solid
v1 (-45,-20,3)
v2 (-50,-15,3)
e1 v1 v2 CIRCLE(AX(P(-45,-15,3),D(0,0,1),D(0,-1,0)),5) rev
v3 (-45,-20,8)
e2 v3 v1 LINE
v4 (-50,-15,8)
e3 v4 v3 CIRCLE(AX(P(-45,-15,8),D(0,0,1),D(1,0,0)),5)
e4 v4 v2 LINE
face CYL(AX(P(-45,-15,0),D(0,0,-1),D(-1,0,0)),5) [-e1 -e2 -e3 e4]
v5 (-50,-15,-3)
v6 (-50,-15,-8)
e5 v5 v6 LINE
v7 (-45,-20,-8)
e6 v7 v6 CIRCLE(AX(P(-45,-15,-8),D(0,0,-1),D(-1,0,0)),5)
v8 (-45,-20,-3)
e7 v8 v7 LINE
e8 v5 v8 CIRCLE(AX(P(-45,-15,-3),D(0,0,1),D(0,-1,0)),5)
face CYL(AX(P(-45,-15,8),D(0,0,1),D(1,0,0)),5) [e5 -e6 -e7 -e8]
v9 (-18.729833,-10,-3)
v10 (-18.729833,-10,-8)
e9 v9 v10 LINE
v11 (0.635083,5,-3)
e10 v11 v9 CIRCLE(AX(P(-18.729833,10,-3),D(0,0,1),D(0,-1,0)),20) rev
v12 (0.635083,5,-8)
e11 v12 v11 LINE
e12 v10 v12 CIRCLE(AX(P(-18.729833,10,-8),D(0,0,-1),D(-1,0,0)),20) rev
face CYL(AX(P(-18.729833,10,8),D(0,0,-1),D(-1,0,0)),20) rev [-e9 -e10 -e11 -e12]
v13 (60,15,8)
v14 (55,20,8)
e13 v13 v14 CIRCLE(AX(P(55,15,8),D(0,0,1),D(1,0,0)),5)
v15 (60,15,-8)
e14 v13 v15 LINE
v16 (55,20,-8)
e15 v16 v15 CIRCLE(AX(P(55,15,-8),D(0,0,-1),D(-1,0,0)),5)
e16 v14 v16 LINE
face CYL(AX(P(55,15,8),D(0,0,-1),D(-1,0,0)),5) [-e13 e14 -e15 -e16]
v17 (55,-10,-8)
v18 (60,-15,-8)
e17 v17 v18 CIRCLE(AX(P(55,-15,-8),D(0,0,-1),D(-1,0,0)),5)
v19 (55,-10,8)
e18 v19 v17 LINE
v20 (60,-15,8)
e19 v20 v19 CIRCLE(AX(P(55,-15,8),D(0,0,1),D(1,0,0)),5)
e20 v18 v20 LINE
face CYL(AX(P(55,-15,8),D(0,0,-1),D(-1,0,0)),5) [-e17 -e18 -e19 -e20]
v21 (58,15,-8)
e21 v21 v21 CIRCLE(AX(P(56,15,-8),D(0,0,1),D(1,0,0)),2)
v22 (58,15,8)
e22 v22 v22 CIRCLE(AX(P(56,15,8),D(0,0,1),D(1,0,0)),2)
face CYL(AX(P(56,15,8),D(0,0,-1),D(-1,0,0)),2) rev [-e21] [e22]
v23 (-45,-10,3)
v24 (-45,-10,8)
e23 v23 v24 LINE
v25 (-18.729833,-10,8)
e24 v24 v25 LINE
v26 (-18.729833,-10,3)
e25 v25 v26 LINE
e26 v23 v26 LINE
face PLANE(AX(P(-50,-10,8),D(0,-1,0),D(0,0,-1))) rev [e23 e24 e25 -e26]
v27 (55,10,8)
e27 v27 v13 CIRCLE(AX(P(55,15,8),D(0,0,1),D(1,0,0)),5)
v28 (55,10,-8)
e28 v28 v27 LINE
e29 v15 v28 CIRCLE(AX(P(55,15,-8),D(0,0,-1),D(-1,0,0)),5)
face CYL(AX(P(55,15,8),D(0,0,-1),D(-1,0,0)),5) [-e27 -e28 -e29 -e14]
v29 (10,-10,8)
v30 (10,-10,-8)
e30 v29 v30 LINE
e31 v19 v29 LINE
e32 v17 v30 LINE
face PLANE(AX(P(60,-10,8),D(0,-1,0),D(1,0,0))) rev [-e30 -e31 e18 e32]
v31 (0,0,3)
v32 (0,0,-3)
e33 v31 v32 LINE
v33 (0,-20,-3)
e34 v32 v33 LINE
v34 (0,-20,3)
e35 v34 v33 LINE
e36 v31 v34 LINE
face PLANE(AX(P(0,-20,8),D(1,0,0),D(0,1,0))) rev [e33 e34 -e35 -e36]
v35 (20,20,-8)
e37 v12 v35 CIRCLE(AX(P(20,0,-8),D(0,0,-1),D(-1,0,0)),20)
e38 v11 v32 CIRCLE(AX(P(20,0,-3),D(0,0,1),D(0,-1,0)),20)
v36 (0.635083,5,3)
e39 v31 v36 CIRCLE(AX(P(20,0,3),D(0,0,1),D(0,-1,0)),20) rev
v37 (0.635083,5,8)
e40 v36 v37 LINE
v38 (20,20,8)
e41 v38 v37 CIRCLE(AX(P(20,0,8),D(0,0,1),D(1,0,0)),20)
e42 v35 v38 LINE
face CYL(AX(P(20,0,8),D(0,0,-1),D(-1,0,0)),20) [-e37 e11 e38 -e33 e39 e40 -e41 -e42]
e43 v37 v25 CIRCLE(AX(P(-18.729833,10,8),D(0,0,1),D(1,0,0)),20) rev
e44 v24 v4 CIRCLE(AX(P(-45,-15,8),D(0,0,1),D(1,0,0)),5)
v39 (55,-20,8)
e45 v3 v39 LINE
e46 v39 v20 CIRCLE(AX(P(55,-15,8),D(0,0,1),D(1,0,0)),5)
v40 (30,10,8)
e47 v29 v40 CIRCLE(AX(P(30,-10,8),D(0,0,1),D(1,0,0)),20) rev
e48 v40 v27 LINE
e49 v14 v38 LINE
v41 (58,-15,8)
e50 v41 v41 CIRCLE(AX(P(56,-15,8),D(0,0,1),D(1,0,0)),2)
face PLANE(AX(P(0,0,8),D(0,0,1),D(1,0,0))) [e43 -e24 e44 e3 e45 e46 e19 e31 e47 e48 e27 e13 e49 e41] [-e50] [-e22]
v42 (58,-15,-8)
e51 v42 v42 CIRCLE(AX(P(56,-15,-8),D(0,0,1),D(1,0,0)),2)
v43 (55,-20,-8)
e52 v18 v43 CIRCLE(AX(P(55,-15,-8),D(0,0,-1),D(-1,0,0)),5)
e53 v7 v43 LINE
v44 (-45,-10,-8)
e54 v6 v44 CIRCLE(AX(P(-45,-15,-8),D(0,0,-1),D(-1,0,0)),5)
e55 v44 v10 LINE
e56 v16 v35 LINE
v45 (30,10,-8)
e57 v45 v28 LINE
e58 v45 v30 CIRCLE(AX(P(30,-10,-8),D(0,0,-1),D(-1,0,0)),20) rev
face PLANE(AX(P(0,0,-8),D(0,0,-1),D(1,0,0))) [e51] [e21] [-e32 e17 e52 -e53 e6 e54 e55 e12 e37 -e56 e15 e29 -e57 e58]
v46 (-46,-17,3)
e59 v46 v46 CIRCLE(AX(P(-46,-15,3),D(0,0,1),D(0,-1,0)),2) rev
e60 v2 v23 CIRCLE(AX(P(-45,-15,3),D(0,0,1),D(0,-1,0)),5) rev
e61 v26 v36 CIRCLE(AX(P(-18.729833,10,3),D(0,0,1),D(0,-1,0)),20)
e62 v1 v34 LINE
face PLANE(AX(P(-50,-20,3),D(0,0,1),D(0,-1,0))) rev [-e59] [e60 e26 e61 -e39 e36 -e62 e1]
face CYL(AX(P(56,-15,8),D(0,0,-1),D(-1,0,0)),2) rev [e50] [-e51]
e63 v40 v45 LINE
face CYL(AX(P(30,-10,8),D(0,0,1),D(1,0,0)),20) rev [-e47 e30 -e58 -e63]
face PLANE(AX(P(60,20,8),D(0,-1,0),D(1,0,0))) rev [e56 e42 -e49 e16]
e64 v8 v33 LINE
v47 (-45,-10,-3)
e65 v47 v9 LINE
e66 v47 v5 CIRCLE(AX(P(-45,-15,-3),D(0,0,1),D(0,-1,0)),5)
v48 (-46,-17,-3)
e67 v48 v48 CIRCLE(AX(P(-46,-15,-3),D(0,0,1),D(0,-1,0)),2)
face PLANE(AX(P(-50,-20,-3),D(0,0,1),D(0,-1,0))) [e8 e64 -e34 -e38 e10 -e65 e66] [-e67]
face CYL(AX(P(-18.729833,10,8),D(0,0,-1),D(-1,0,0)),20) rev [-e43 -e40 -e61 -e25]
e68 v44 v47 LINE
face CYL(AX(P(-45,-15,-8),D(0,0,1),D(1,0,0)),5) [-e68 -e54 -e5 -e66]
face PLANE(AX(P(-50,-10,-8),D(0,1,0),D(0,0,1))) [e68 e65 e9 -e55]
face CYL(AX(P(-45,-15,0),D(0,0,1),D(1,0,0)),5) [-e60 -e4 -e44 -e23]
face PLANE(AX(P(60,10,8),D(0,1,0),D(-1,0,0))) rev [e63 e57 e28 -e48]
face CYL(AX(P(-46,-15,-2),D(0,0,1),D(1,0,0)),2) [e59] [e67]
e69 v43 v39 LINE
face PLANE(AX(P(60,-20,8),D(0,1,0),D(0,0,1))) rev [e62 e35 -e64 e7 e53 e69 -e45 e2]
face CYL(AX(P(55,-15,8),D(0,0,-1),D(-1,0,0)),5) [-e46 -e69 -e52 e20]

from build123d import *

# Parameters (mm, degrees)
SKETCH1_R           = 2
BOSS_EXTRUDE1_DEPTH = 8
SKETCH2_W           = 5
SKETCH2_H           = 10
BOSS_EXTRUDE2_DEPTH = 50
SKETCH3_R           = 2
BOSS_EXTRUDE3_DEPTH = 5
FILLET1_R           = 20
FILLET2_R           = 20
FILLET3_R           = 20
FILLET4_R           = 5


# Some blends are built 0.0001 mm under size
with BuildPart() as part:
    # Sketch1 → Boss-Extrude1 (new body)
    with BuildSketch(Plane.XY):
        Polygon((60, 20), (0, 20), (0, 0), (0, -20), (60, -20), (60, -10), (10, -10), (10, 0), (10, 10), (60, 10), align=None)
        with Locations((56, 15)):
            Circle(SKETCH1_R, mode=Mode.SUBTRACT)
        with Locations((56, -15)):
            Circle(SKETCH1_R, mode=Mode.SUBTRACT)
    boss_extrude1 = extrude(amount=BOSS_EXTRUDE1_DEPTH)

    # Sketch2 → Boss-Extrude2 (add)
    with BuildSketch(Plane.ZY):
        with Locations((5.5, -15)):
            Rectangle(SKETCH2_W, SKETCH2_H)
    boss_extrude2 = extrude(amount=BOSS_EXTRUDE2_DEPTH)

    # Sketch3 → Boss-Extrude3 (add)
    with BuildSketch(Plane(origin=(0, 0, 3), x_dir=(-1, 0, 0), z_dir=(0, 0, -1))):
        with Locations(Location((46, -15, 0), (0, 0, 270))):
            Circle(SKETCH3_R)
    boss_extrude3 = extrude(amount=BOSS_EXTRUDE3_DEPTH)

    # Mirror1: Boss-Extrude1, Boss-Extrude2, Boss-Extrude3 across plane
    add(boss_extrude1.mirror(Plane.XY))
    add(boss_extrude2.mirror(Plane.XY))
    add(boss_extrude3.mirror(Plane.XY))

    # Fillet1
    fillet1_edges = [part.edges().sort_by_distance(p)[0] for p in [
        (10, 10, 0),
    ]]
    fillet(fillet1_edges, radius=FILLET1_R - 0.0001)  # a hair under: the kernel refuses the full size

    # Fillet2
    fillet2_edges = [part.edges().sort_by_distance(p)[0] for p in [
        (0, 20, 0),
    ]]
    fillet(fillet2_edges, radius=FILLET2_R)

    # Fillet3
    # the kernel refuses this fillet: 20 mm, written as the material it adds along each edge
    with BuildSketch(Plane(origin=(0, -10, -43.824583655), x_dir=(0.042300987596812424, 0.9991049126334702, 0), z_dir=(0, 0, 1))) as fillet3_piece_1_section:
        with BuildLine():
            CenterArc((19.1898078, 19.559088377), FILLET3_R, 182.424391449, 75.522487814)
            Line((-0.792290453, 18.713068625), (-2.790500278, 18.62846665))
            Line((-2.790500278, 18.62846665), (-1.998209825, -0.084601975))
            Line((-1.998209825, -0.084601975), (0.084601975, -1.998209825))
            ThreePointArc((0.084601975, -1.998209825), (10.075651102, -1.575199949), (14.595801393, -1.955908838))
            Line((14.595801393, -1.955908838), (15.013438339, 0))
        make_face()
    fillet3_piece_1 = extrude(amount=98.64916731, mode=Mode.PRIVATE)
    fillet3_piece_1 = split(fillet3_piece_1, bisect_by=Plane(origin=(-6.457889851, -5.843011077, -8), z_dir=(0, 0, 1)), keep=Keep.TOP, mode=Mode.PRIVATE)
    fillet3_piece_1 = split(fillet3_piece_1, bisect_by=Plane(origin=(-6.457889851, -5.843011077, -3), z_dir=(0, 0, -1)), keep=Keep.TOP, mode=Mode.PRIVATE)
    add(fillet3_piece_1)
    with BuildSketch(Plane(origin=(0, -10, 3), x_dir=(0.042300987596807504, 0.9991049126334706, 0), z_dir=(0, 0, 1))) as fillet3_piece_2:
        with BuildLine():
            CenterArc((19.1898078, 19.559088377), FILLET3_R, 182.424391449, 75.522487814)
            Line((-0.792290453, 18.713068625), (-2.790500278, 18.62846665))
            Line((-2.790500278, 18.62846665), (-1.998209825, -0.084601975))
            Line((-1.998209825, -0.084601975), (0.084601975, -1.998209825))
            ThreePointArc((0.084601975, -1.998209825), (10.075651102, -1.575199949), (14.595801393, -1.955908838))
            Line((14.595801393, -1.955908838), (15.013438339, 0))
        make_face()
    extrude(amount=5)
    with BuildSketch(Plane(origin=(0, -10, 43.824583655), x_dir=(0.042300987596812424, 0.9991049126334702, 0), z_dir=(0, 0, -1))) as fillet3_piece_3_section:
        with BuildLine():
            CenterArc((19.1898078, -19.559088377), FILLET3_R, 102.053120737, 75.522487814)
            Line((-0.792290453, -18.713068625), (-2.790500278, -18.62846665))
            Line((-2.790500278, -18.62846665), (-1.998209825, 0.084601975))
            Line((-1.998209825, 0.084601975), (0.084601975, 1.998209825))
            ThreePointArc((0.084601975, 1.998209825), (10.075651102, 1.575199949), (14.595801393, 1.955908838))
            Line((14.595801393, 1.955908838), (15.013438339, 0))
        make_face()
    fillet3_piece_3 = extrude(amount=98.64916731, mode=Mode.PRIVATE)
    fillet3_piece_3 = split(fillet3_piece_3, bisect_by=Plane(origin=(-6.457889851, -5.843011077, 8), z_dir=(0, 0, -1)), keep=Keep.TOP, mode=Mode.PRIVATE)
    fillet3_piece_3 = split(fillet3_piece_3, bisect_by=Plane(origin=(-6.457889851, -5.843011077, 3), z_dir=(0, 0, 1)), keep=Keep.TOP, mode=Mode.PRIVATE)
    add(fillet3_piece_3)
    with BuildSketch(Plane(origin=(0, -10, -3), x_dir=(0.042300987596807504, 0.9991049126334706, 0), z_dir=(0, 0, -1))) as fillet3_piece_4:
        with BuildLine():
            CenterArc((19.1898078, -19.559088377), FILLET3_R, 102.053120737, 75.522487814)
            Line((-0.792290453, -18.713068625), (-2.790500278, -18.62846665))
            Line((-2.790500278, -18.62846665), (-1.998209825, 0.084601975))
            Line((-1.998209825, 0.084601975), (0.084601975, 1.998209825))
            ThreePointArc((0.084601975, 1.998209825), (10.075651102, 1.575199949), (14.595801393, 1.955908838))
            Line((14.595801393, 1.955908838), (15.013438339, 0))
        make_face()
    extrude(amount=5)
    # the kernel refuses this fillet: 20 mm, written as the material it takes off along each edge

    # Fillet4
    # the kernel refuses this fillet: 5 mm, written as the material it takes off along each edge
    with BuildSketch(Plane(origin=(60, 10, 20.5), x_dir=(0, 1, 0), z_dir=(0, 0, -1)), Plane(origin=(60, 20, 20.5), x_dir=(-1, 0, 0), z_dir=(0, 0, -1))) as fillet4_piece_1:
        with BuildLine():
            CenterArc((FILLET4_R, -FILLET4_R), FILLET4_R, 90, 90)
            Line((0, -FILLET4_R), (0, 0))
            Line((0, 0), (FILLET4_R, 0))
        make_face()
    extrude(amount=41, mode=Mode.SUBTRACT)
    with BuildSketch(Plane(origin=(60, -10, -20.5), x_dir=(-1, 0, 0), z_dir=(0, 0, 1)), Plane(origin=(60, -20, -20.5), x_dir=(0, 1, 0), z_dir=(0, 0, 1))) as fillet4_piece_2:
        with BuildLine():
            CenterArc((FILLET4_R, FILLET4_R), FILLET4_R, 180, 90)
            Line((0, FILLET4_R), (0, 0))
            Line((0, 0), (FILLET4_R, 0))
        make_face()
    extrude(amount=41, mode=Mode.SUBTRACT)
    with BuildSketch(Plane(origin=(-50, -10, -9.5), x_dir=(1, 0, 0), z_dir=(0, 0, 1)), Plane(origin=(-50, -10, 9.5), x_dir=(0, -1, 0), z_dir=(0, 0, -1))) as fillet4_piece_3:
        with BuildLine():
            CenterArc((FILLET4_R, -FILLET4_R), FILLET4_R, 90, 90)
            Line((0, -FILLET4_R), (0, 0))
            Line((0, 0), (FILLET4_R, 0))
        make_face()
    extrude(amount=30, mode=Mode.SUBTRACT)
    with BuildSketch(Plane(origin=(-50, -20, 20.5), x_dir=(0, 1, 0), z_dir=(0, 0, -1)), Plane(origin=(-50, -20, -20.5), x_dir=(1, 0, 0), z_dir=(0, 0, 1))) as fillet4_piece_4:
        with BuildLine():
            CenterArc((FILLET4_R, FILLET4_R), FILLET4_R, 180, 90)
            Line((0, FILLET4_R), (0, 0))
            Line((0, 0), (FILLET4_R, 0))
        make_face()
    extrude(amount=30, mode=Mode.SUBTRACT)


solid = part.part
